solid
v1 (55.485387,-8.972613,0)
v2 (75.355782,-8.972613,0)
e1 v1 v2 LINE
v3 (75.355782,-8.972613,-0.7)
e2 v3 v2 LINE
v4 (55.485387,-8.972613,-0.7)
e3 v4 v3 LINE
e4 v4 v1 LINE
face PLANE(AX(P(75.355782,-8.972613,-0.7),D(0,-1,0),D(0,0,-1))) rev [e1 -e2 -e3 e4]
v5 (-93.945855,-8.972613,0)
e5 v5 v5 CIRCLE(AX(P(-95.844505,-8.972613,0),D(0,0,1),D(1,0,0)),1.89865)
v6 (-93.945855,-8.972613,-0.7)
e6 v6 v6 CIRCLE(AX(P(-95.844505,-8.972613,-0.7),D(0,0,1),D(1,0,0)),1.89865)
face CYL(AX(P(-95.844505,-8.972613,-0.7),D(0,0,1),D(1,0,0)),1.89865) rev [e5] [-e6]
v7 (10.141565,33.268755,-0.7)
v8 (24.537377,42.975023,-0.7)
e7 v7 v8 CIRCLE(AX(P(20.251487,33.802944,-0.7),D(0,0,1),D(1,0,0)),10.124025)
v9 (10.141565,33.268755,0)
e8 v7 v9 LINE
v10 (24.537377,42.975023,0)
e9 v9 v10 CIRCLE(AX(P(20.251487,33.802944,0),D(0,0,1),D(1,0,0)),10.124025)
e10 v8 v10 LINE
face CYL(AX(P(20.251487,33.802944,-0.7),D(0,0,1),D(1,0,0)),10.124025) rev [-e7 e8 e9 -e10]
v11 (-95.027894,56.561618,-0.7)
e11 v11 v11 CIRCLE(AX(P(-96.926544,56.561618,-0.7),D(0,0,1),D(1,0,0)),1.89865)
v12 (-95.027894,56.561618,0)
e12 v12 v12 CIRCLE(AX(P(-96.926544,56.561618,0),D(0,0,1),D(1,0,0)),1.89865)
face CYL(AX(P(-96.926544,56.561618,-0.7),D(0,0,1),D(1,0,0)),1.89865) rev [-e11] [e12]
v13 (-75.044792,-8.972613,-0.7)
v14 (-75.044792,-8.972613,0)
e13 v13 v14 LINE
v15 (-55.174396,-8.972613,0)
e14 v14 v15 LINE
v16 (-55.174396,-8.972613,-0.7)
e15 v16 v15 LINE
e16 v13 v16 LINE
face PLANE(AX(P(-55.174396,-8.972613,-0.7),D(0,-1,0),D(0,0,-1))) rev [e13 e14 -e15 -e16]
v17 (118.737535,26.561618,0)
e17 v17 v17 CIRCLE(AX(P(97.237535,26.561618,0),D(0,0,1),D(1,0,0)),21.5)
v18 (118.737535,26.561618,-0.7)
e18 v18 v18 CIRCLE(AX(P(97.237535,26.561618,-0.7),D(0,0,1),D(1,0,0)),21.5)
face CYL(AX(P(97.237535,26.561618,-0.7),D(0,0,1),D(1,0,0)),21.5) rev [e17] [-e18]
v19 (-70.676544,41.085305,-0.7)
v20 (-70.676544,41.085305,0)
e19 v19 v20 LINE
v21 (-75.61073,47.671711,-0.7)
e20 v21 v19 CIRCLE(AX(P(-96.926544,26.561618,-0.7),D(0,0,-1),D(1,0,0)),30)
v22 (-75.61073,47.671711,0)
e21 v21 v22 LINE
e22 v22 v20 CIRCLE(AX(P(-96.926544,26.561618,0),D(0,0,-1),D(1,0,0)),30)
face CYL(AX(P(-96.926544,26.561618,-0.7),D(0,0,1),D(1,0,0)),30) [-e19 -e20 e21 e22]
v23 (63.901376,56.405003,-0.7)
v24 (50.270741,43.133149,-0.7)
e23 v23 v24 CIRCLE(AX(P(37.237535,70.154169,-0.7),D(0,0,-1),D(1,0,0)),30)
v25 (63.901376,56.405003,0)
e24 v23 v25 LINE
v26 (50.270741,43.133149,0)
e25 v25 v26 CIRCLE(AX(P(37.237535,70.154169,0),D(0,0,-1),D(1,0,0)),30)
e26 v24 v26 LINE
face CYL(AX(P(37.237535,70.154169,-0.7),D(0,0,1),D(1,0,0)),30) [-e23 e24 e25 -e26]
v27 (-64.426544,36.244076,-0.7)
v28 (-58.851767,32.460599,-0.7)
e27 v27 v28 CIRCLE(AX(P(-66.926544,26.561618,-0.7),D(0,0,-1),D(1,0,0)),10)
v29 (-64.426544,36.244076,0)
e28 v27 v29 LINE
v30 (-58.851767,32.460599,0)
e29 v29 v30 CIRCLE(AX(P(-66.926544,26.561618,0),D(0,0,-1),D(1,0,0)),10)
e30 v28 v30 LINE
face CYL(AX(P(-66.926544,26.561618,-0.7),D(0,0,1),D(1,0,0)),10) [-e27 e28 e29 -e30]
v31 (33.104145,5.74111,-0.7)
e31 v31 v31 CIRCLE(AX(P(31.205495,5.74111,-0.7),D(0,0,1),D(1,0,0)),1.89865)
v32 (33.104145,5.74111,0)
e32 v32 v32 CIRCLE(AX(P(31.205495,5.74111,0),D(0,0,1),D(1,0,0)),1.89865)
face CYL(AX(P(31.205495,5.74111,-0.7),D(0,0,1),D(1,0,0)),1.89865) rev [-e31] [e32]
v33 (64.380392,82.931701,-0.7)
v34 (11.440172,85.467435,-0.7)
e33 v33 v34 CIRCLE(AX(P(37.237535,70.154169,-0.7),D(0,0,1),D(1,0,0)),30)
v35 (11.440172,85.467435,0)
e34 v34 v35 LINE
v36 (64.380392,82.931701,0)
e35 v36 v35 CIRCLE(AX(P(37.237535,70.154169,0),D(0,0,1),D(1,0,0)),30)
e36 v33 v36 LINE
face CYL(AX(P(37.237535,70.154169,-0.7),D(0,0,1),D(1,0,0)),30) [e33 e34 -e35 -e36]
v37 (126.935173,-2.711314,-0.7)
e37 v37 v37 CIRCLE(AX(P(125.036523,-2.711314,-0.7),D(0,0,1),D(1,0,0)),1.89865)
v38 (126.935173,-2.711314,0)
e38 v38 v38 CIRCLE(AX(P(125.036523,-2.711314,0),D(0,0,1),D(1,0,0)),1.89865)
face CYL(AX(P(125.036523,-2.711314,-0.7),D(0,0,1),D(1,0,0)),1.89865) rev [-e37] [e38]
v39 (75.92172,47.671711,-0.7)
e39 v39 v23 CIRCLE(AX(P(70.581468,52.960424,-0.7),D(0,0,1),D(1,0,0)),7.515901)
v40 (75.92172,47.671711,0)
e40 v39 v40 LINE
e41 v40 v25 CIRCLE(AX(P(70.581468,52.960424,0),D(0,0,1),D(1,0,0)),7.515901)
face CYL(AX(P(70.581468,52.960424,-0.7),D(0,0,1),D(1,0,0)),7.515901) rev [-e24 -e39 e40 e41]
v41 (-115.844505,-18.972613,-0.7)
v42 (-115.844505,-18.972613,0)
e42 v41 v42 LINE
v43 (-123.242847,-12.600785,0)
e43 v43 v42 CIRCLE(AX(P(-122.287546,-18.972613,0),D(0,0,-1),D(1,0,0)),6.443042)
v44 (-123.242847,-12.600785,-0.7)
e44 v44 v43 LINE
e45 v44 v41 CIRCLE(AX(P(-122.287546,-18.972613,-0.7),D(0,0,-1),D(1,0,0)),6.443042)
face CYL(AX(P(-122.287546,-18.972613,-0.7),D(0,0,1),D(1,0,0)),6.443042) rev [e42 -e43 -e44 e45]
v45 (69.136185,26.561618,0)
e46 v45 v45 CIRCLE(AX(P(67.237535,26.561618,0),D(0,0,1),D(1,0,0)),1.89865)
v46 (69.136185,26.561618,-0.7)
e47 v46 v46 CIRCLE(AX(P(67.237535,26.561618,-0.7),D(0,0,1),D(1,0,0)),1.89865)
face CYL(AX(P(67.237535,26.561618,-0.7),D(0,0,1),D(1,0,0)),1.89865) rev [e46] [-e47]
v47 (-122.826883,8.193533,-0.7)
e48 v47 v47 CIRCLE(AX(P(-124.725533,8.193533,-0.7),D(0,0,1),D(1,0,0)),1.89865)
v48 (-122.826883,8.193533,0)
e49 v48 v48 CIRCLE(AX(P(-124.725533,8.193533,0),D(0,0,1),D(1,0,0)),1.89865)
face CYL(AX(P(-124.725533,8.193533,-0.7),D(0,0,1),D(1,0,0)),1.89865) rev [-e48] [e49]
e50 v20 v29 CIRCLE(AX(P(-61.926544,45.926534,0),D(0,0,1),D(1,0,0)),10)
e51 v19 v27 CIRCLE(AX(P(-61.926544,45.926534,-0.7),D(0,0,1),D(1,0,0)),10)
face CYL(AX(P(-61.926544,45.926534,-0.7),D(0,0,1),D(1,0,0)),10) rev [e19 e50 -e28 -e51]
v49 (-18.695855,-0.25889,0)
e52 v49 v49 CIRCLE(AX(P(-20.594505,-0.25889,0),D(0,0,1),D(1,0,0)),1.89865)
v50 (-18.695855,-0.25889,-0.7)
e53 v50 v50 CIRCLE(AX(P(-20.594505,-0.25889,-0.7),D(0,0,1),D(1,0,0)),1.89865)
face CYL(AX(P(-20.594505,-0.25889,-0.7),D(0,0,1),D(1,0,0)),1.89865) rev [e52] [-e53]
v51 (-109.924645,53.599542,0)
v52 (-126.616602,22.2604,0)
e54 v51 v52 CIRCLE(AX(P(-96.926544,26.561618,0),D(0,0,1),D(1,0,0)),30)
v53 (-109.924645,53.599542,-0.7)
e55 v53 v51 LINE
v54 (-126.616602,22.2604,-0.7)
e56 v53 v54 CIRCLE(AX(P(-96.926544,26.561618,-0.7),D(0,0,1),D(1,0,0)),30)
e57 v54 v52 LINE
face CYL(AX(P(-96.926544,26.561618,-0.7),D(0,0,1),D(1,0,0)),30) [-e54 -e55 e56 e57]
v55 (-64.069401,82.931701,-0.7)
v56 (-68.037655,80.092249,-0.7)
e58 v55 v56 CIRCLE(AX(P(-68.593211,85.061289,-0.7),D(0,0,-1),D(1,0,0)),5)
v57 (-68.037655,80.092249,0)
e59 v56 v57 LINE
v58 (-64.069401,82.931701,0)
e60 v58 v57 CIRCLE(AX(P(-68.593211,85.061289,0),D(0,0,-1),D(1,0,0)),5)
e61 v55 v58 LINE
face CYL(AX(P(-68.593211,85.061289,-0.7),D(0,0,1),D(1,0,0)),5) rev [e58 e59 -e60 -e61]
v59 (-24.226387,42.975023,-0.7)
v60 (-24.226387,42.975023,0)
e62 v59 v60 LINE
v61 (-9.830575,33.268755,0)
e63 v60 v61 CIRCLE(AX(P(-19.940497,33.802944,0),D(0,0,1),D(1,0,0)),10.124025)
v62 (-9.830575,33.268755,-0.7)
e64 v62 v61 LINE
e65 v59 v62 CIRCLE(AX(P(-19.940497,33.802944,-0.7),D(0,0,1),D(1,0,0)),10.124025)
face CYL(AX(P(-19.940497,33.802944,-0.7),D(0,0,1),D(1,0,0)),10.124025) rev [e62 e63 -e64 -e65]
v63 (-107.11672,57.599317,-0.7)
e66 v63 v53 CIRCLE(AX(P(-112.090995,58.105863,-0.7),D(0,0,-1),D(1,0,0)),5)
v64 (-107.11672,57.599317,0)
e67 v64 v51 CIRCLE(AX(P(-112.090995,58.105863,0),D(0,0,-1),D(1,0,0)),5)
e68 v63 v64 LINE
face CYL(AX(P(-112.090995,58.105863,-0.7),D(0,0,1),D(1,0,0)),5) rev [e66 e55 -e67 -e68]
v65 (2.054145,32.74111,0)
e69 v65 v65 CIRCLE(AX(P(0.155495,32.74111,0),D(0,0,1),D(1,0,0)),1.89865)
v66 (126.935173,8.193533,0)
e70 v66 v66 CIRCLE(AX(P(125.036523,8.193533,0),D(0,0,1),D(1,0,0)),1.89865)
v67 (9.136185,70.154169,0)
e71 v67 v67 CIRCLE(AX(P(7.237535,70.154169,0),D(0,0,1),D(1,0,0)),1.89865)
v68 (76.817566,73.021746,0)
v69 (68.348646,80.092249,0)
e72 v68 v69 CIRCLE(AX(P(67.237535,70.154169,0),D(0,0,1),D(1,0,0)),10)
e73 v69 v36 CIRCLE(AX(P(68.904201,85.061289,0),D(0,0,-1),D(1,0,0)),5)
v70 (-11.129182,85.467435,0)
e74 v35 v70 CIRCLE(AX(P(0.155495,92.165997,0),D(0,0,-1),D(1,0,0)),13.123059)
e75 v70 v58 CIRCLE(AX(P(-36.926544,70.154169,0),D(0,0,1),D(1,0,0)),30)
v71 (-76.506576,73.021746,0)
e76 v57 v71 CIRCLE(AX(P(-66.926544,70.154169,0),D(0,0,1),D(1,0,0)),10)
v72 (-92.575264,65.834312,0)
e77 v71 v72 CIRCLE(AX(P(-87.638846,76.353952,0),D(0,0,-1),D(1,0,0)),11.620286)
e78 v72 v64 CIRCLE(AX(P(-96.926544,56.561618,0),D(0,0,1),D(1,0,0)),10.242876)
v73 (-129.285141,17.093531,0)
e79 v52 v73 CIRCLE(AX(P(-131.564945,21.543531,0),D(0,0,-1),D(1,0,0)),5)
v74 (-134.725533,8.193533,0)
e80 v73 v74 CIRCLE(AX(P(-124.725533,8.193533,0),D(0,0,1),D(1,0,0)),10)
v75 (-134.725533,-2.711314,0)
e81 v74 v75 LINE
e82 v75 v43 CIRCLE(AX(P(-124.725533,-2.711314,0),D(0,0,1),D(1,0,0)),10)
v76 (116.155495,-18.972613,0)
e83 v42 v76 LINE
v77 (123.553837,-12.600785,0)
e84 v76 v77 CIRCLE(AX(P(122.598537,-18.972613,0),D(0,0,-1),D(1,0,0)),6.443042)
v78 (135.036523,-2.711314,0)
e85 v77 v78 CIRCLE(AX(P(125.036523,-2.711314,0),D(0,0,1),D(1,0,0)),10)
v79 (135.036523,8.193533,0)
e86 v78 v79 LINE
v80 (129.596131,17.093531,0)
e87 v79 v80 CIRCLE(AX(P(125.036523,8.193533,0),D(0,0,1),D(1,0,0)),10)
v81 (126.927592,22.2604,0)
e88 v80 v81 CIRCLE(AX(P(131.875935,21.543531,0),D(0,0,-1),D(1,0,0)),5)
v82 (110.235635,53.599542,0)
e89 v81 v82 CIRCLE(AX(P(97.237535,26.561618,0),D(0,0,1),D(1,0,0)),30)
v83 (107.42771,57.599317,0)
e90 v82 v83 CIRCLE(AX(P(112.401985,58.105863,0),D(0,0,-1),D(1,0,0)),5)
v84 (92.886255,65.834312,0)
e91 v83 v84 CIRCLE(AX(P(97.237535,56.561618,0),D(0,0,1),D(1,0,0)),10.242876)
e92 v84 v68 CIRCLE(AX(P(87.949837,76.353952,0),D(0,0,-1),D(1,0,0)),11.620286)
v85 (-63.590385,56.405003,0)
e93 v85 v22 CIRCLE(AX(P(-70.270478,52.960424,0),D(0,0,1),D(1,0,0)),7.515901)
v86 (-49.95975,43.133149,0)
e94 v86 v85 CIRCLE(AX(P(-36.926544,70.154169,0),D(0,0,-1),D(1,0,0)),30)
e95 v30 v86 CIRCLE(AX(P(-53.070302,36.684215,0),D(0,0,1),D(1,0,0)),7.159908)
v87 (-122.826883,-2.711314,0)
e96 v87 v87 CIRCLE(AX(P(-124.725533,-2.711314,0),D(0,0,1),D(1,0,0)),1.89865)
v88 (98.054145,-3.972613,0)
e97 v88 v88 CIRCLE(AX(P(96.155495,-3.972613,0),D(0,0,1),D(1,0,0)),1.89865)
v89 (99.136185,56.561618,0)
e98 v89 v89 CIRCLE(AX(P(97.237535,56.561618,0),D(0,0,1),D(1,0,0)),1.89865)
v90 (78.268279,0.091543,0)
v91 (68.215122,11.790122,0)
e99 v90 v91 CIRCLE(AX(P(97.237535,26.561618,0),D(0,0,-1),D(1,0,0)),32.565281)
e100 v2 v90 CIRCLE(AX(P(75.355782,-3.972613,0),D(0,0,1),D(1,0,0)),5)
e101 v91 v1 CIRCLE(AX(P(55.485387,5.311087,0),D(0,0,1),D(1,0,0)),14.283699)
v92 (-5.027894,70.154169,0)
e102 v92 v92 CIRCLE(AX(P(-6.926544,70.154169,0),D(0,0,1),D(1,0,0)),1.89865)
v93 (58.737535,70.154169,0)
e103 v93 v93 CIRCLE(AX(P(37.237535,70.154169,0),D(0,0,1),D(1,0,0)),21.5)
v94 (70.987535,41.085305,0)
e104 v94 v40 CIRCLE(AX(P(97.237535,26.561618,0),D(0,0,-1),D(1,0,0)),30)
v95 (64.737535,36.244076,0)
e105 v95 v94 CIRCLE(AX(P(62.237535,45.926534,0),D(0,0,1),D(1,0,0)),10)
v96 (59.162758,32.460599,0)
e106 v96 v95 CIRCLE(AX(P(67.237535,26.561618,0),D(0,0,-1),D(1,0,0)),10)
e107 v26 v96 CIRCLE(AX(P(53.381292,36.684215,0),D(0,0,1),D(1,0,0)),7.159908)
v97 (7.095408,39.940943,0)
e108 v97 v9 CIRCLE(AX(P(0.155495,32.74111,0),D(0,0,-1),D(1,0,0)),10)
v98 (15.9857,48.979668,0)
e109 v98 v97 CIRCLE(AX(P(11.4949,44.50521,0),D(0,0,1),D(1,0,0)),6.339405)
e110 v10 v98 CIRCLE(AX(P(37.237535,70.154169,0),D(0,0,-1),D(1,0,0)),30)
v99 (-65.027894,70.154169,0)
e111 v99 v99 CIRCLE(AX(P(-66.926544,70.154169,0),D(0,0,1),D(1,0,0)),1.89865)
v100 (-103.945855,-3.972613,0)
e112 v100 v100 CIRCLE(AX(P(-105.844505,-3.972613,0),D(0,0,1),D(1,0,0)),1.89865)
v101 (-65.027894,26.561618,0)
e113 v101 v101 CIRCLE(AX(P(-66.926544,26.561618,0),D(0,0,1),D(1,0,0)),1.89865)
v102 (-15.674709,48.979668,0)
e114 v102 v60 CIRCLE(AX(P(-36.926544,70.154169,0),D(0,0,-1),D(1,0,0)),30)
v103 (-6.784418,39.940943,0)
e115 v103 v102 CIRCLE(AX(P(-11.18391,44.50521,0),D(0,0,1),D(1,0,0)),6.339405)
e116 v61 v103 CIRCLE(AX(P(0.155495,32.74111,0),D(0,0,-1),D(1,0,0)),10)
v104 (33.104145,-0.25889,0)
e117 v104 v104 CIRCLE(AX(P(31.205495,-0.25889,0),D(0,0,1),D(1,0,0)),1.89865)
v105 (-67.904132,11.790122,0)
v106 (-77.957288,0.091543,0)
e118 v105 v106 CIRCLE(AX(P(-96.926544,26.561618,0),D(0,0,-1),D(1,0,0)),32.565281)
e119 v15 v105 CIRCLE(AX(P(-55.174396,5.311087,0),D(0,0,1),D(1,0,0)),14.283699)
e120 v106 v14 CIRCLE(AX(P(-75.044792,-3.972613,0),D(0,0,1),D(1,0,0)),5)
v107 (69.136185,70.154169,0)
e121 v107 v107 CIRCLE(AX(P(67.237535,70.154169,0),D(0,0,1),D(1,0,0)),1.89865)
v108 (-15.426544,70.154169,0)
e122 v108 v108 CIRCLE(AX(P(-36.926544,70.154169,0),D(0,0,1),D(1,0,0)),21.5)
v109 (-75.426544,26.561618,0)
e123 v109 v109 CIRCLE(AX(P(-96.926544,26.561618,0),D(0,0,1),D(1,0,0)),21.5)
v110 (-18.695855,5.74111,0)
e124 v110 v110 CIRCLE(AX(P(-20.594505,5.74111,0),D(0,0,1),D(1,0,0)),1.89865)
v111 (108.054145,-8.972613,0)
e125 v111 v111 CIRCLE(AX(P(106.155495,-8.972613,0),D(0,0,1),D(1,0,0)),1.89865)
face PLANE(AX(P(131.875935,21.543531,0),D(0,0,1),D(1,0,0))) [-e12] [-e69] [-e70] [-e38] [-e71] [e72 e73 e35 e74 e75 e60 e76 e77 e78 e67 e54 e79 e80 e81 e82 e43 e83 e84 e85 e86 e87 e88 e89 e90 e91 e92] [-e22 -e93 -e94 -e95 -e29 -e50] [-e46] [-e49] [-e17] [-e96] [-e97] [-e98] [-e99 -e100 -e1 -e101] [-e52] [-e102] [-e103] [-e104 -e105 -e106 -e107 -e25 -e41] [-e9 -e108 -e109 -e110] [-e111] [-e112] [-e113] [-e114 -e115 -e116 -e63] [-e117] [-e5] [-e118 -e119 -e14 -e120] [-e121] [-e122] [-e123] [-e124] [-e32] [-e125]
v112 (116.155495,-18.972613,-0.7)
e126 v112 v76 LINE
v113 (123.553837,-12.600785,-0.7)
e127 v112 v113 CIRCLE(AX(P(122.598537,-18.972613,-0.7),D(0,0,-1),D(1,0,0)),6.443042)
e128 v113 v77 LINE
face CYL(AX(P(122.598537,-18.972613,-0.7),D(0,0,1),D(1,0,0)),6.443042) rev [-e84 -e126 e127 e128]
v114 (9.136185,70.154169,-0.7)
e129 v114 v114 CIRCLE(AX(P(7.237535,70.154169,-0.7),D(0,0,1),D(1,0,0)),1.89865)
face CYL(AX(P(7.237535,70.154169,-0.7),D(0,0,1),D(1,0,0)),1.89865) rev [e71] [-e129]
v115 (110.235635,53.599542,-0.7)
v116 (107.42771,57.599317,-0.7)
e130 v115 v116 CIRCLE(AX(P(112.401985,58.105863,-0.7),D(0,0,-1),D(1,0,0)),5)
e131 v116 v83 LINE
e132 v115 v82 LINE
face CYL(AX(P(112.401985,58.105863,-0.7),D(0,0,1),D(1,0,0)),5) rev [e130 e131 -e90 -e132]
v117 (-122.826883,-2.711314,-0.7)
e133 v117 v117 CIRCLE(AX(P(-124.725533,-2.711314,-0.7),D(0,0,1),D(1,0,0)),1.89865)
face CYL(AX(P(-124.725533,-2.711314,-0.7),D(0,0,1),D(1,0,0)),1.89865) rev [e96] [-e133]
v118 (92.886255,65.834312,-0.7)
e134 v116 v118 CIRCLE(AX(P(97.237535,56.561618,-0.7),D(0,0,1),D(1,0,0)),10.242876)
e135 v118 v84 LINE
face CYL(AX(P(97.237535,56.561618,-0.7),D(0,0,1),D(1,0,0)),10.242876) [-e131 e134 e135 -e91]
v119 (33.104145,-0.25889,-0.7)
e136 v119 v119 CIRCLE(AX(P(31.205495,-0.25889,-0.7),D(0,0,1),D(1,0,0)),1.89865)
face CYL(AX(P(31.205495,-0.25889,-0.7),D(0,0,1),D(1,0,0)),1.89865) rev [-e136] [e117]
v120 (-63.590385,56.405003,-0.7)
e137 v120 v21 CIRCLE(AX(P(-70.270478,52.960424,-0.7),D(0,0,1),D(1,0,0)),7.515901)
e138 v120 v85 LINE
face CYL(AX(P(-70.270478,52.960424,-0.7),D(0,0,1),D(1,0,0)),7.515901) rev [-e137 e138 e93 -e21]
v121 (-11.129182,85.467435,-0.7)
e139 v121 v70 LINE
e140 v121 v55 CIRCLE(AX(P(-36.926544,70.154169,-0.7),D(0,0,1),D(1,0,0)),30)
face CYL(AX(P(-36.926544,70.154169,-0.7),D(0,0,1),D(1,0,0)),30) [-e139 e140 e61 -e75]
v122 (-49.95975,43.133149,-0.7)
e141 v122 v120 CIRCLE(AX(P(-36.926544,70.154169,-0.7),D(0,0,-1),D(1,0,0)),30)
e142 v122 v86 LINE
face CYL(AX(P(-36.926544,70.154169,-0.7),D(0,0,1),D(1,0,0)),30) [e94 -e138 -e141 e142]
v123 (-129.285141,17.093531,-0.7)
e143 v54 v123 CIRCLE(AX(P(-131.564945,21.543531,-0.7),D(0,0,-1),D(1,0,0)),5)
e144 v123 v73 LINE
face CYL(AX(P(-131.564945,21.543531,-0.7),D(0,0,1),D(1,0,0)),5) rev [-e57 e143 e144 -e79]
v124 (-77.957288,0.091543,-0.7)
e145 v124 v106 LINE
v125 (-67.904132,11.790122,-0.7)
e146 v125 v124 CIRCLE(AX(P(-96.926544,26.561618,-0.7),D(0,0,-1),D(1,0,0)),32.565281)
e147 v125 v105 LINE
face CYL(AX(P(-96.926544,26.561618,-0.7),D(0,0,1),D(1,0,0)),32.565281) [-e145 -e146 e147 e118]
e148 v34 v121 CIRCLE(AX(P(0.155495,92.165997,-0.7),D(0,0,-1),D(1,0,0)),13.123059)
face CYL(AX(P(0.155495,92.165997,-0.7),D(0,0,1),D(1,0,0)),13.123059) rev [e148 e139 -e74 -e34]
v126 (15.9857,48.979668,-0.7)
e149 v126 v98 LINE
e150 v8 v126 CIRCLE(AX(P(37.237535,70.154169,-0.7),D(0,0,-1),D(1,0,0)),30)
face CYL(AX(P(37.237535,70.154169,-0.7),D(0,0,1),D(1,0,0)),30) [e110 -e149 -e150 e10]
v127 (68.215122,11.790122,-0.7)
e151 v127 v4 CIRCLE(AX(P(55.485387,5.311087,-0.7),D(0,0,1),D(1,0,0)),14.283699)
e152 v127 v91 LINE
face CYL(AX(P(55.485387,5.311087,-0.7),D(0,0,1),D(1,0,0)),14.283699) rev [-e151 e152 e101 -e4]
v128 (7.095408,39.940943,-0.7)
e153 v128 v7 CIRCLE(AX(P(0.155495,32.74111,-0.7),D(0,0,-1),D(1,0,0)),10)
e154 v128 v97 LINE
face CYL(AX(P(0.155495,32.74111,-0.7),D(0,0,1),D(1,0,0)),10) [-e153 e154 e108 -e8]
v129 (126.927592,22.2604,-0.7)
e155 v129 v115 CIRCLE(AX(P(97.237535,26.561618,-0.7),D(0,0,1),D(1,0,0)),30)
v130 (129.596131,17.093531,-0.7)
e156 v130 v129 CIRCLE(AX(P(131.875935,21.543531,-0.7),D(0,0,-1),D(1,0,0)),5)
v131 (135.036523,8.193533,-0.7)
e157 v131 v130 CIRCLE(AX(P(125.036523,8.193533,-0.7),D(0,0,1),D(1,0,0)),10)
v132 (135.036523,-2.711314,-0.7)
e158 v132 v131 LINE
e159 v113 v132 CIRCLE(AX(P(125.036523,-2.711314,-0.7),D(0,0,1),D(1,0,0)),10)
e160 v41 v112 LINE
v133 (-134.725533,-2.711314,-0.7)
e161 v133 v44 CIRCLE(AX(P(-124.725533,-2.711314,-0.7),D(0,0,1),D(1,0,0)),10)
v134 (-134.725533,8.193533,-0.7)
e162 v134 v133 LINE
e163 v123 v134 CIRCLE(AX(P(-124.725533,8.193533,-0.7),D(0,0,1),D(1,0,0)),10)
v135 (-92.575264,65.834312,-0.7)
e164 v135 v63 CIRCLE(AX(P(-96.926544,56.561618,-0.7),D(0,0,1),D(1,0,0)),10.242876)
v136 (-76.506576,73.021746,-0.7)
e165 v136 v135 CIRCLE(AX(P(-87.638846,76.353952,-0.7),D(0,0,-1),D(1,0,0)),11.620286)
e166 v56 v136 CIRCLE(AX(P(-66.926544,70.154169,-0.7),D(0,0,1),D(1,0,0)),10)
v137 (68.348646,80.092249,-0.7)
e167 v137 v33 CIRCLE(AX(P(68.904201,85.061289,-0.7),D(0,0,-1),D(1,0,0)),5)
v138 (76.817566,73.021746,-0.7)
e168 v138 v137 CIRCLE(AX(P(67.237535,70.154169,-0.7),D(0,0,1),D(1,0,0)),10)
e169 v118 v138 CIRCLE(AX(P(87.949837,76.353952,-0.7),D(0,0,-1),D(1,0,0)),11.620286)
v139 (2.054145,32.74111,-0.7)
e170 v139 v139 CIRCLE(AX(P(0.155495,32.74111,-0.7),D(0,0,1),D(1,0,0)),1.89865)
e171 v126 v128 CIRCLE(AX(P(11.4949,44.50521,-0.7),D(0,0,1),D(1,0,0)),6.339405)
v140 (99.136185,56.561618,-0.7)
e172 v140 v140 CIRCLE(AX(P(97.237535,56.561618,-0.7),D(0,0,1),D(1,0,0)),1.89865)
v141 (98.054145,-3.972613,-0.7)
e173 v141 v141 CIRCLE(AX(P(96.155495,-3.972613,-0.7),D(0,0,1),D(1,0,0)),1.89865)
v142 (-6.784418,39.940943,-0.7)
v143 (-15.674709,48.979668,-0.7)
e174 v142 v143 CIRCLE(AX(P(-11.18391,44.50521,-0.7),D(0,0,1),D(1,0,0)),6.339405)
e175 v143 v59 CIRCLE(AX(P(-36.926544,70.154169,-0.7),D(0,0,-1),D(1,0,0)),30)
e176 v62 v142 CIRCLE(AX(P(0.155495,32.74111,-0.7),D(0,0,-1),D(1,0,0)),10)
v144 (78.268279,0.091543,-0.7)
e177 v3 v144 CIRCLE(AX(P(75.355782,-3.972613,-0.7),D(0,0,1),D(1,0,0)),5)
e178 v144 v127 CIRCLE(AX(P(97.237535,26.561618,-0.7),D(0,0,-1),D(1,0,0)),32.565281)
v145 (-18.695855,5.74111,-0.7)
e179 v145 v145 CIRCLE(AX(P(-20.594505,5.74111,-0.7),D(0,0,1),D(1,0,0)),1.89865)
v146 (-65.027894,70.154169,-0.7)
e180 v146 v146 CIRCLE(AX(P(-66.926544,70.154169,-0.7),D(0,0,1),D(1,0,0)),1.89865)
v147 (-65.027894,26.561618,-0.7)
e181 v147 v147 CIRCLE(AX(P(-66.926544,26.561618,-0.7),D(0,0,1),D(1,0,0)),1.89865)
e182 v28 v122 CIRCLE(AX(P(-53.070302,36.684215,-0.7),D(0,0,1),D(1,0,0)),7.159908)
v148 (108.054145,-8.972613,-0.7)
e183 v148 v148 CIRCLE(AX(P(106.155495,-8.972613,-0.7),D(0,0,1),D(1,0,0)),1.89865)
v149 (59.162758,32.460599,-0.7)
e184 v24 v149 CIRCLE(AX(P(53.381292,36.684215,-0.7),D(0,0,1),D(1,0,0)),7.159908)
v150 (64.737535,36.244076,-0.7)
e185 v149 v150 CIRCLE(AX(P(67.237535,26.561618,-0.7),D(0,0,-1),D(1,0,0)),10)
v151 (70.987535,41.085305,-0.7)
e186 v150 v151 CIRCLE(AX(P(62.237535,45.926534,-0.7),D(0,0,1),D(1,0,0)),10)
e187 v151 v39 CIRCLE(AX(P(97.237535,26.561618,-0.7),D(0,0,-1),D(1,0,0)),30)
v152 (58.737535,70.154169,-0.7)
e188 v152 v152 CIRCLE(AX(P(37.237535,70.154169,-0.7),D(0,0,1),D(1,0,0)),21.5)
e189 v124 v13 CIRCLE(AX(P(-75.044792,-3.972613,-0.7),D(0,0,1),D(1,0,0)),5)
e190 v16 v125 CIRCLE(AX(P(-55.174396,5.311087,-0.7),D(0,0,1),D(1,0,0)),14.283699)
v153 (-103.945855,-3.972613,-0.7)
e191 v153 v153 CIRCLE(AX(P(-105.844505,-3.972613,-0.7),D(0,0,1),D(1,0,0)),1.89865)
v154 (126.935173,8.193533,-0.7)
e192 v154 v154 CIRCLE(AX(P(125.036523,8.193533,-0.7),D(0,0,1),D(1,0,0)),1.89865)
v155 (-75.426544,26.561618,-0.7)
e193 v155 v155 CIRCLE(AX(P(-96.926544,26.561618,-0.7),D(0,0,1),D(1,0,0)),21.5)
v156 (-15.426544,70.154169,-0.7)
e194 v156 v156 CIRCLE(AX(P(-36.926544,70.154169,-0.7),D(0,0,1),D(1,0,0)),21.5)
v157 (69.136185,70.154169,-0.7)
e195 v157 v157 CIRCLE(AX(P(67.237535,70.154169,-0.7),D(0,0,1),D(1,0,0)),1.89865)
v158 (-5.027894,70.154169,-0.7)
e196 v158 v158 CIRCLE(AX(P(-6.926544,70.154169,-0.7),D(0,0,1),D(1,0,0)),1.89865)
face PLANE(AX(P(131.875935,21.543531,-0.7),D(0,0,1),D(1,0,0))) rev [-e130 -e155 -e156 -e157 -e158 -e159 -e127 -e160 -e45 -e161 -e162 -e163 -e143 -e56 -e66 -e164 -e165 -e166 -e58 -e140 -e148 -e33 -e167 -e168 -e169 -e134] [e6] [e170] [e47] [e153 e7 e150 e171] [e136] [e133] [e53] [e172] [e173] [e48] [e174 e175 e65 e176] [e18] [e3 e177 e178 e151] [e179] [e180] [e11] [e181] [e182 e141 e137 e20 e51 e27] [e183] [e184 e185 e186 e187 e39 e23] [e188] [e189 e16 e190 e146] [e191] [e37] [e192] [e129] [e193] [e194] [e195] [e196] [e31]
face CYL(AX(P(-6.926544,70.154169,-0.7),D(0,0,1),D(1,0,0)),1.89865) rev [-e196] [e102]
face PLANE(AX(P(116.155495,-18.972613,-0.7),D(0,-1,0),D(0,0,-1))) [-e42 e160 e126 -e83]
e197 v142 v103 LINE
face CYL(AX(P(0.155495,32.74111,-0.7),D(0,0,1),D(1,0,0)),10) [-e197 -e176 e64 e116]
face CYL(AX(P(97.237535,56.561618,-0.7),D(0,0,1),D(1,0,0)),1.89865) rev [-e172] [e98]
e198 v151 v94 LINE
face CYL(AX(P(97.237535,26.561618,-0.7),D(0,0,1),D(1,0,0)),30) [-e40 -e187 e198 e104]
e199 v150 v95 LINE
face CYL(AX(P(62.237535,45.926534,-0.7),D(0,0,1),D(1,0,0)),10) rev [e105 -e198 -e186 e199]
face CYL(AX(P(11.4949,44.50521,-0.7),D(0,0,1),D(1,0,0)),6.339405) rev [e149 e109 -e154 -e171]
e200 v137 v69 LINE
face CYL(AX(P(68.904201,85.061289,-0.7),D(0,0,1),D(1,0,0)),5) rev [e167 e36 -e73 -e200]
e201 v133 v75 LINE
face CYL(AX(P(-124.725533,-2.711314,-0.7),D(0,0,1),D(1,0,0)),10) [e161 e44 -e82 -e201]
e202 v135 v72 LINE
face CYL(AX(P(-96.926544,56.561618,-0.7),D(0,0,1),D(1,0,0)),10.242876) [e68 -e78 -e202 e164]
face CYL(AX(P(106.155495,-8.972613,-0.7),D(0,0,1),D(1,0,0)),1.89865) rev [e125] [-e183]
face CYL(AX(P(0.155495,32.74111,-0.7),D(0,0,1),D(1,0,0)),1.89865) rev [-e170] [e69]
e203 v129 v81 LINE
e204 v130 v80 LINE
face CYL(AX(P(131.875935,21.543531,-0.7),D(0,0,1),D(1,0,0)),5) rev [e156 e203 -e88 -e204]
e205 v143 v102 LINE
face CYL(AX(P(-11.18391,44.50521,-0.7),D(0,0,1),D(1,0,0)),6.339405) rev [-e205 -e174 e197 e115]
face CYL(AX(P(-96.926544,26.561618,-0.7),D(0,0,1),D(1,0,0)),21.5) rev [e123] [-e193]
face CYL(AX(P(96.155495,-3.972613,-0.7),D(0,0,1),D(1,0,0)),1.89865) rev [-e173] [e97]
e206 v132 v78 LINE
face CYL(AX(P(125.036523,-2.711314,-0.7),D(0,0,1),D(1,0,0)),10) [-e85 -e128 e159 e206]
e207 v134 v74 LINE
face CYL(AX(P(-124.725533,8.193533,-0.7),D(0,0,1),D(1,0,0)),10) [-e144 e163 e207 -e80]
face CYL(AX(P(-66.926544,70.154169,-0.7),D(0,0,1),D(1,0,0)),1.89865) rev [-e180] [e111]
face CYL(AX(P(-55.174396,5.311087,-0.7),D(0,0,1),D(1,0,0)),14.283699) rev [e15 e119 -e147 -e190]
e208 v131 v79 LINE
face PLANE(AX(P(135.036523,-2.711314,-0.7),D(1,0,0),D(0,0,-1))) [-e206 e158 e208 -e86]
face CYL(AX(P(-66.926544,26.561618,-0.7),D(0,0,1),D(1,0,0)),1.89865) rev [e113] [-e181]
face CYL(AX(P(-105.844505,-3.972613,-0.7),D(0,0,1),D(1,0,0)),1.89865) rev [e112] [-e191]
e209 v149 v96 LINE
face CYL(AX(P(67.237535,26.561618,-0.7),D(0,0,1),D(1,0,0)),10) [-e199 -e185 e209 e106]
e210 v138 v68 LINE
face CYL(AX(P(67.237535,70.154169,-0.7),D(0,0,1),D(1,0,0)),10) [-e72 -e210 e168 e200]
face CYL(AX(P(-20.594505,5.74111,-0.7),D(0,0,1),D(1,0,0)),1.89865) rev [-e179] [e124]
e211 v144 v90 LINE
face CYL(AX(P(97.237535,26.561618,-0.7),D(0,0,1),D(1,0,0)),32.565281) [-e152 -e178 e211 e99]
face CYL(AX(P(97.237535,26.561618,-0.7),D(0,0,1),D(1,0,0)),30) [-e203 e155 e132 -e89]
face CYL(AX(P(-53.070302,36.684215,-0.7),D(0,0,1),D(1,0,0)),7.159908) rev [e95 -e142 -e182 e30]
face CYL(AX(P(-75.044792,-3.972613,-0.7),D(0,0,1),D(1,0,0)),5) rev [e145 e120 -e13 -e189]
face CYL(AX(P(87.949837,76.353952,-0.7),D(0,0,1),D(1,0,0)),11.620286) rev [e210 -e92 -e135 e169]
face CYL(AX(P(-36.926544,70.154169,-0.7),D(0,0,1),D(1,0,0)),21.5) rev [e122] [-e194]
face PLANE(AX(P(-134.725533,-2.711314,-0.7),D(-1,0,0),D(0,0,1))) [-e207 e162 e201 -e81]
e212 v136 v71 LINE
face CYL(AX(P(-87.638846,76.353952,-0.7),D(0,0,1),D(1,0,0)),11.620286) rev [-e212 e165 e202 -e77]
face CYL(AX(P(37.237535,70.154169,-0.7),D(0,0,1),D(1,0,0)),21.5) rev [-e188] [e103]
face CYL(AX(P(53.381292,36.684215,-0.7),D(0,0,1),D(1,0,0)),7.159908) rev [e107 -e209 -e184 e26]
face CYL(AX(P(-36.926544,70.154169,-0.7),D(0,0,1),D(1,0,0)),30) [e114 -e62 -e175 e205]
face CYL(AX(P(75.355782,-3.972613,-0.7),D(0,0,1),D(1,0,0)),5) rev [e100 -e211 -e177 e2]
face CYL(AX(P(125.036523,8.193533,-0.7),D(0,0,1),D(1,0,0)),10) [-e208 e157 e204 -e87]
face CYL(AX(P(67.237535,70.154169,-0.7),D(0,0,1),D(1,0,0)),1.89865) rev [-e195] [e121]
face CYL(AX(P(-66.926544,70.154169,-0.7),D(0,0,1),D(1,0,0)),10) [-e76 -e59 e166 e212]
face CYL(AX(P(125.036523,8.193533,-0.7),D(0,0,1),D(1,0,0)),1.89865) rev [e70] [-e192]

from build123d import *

# Parameters (mm, degrees)
MODEL_R            = 21.5
MODEL_R_2          = 1.89865
BASE_FLANGE1_DEPTH = 0.7


# Sheet-metal steps are written as plain solids
with BuildPart() as part:
    # Model → Base-Flange1 (new body)
    with BuildSketch(Plane.XY):
        with BuildLine():
            Line((-134.72553251, -2.711313899), (-134.72553251, 8.193532943))
            ThreePointArc((-134.72553251, 8.193532943), (-133.25770932, 13.409082664), (-129.285140732, 17.093531418))
            ThreePointArc((-129.285140732, 17.093531418), (-127.122461212, 19.249115875), (-126.616601885, 22.260400219))
            ThreePointArc((-126.616601885, 22.260400219), (-123.404934832, 40.6646253), (-109.924644657, 53.599542498))
            ThreePointArc((-109.924644657, 53.599542498), (-107.998724055, 55.233004005), (-107.116719879, 57.599316598))
            ThreePointArc((-107.116719879, 57.599316598), (-101.974015213, 65.474503584), (-92.575264278, 65.83431216))
            ThreePointArc((-92.575264278, 65.83431216), (-82.894170466, 65.746450056), (-76.506575672, 73.021745919))
            ThreePointArc((-76.506575672, 73.021745919), (-73.335376859, 77.830552746), (-68.037655249, 80.092249178))
            ThreePointArc((-68.037655249, 80.092249178), (-65.683638934, 80.995038824), (-64.06940128, 82.931700578))
            ThreePointArc((-64.06940128, 82.931700578), (-38.361840541, 100.119815012), (-11.129181755, 85.467434576))
            ThreePointArc((-11.129181755, 85.467434576), (0.155495187, 79.042938382), (11.440172129, 85.467434576))
            ThreePointArc((11.440172129, 85.467434576), (38.672830915, 100.119815012), (64.380391655, 82.931700578))
            ThreePointArc((64.380391655, 82.931700578), (65.994629309, 80.995038824), (68.348645623, 80.092249178))
            ThreePointArc((68.348645623, 80.092249178), (73.646367234, 77.830552746), (76.817566047, 73.021745919))
            ThreePointArc((76.817566047, 73.021745919), (83.205160841, 65.746450057), (92.886254653, 65.83431216))
            ThreePointArc((92.886254653, 65.83431216), (102.285005587, 65.474503584), (107.427710253, 57.599316599))
            ThreePointArc((107.427710253, 57.599316599), (108.309714429, 55.233004005), (110.235635031, 53.599542498))
            ThreePointArc((110.235635031, 53.599542498), (123.715925206, 40.6646253), (126.92759226, 22.260400219))
            ThreePointArc((126.92759226, 22.260400219), (127.433451587, 19.249115875), (129.596131107, 17.093531418))
            ThreePointArc((129.596131107, 17.093531418), (133.568699694, 13.409082664), (135.036522885, 8.193532943))
            Line((135.036522885, 8.193532943), (135.036522885, -2.711313899))
            ThreePointArc((135.036522885, -2.711313899), (131.562361662, -10.288478821), (123.553837233, -12.600785232))
            ThreePointArc((123.553837233, -12.600785232), (118.393911689, -14.090613855), (116.155495187, -18.972612677))
            Line((116.155495187, -18.972612677), (-115.844504813, -18.972612677))
            ThreePointArc((-115.844504813, -18.972612677), (-118.082921315, -14.090613855), (-123.242846859, -12.600785232))
            ThreePointArc((-123.242846859, -12.600785232), (-131.251371287, -10.288478821), (-134.72553251, -2.711313899))
        make_face()
        with Locations((97.237534512, 26.561617598)):
            Circle(MODEL_R, mode=Mode.SUBTRACT)
        with Locations((37.237534512, 70.154169278)):
            Circle(MODEL_R, mode=Mode.SUBTRACT)
        with Locations((-36.926544138, 70.154169278)):
            Circle(MODEL_R, mode=Mode.SUBTRACT)
        with Locations((-96.926544138, 26.561617598)):
            Circle(MODEL_R, mode=Mode.SUBTRACT)
        with Locations((-66.926544138, 26.561617598)):
            Circle(MODEL_R_2, mode=Mode.SUBTRACT)
        with Locations((-96.926544138, 56.561617598)):
            Circle(MODEL_R_2, mode=Mode.SUBTRACT)
        with Locations((-66.926544138, 70.154169278)):
            Circle(MODEL_R_2, mode=Mode.SUBTRACT)
        with Locations((-6.926544138, 70.154169278)):
            Circle(MODEL_R_2, mode=Mode.SUBTRACT)
        with Locations((7.237534512, 70.154169278)):
            Circle(MODEL_R_2, mode=Mode.SUBTRACT)
        with Locations((67.237534512, 70.154169278)):
            Circle(MODEL_R_2, mode=Mode.SUBTRACT)
        with Locations((67.237534512, 26.561617598)):
            Circle(MODEL_R_2, mode=Mode.SUBTRACT)
        with Locations((97.237534512, 56.561617598)):
            Circle(MODEL_R_2, mode=Mode.SUBTRACT)
        with Locations((31.205495187, 5.741109522)):
            Circle(MODEL_R_2, mode=Mode.SUBTRACT)
        with Locations((31.205495187, -0.258890478)):
            Circle(MODEL_R_2, mode=Mode.SUBTRACT)
        with Locations((-20.594504813, 5.741109522)):
            Circle(MODEL_R_2, mode=Mode.SUBTRACT)
        with Locations((-20.594504813, -0.258890478)):
            Circle(MODEL_R_2, mode=Mode.SUBTRACT)
        with Locations((106.155495187, -8.972612677)):
            Circle(MODEL_R_2, mode=Mode.SUBTRACT)
        with Locations((96.155495187, -3.972612677)):
            Circle(MODEL_R_2, mode=Mode.SUBTRACT)
        with Locations((-95.844504813, -8.972612677)):
            Circle(MODEL_R_2, mode=Mode.SUBTRACT)
        with Locations((-105.844504813, -3.972612677)):
            Circle(MODEL_R_2, mode=Mode.SUBTRACT)
        with Locations((0.155495187, 32.741109522)):
            Circle(MODEL_R_2, mode=Mode.SUBTRACT)
        with Locations((125.036522885, 8.193532943)):
            Circle(MODEL_R_2, mode=Mode.SUBTRACT)
        with Locations((125.036522885, -2.711313899)):
            Circle(MODEL_R_2, mode=Mode.SUBTRACT)
        with Locations((-124.72553251, 8.193532943)):
            Circle(MODEL_R_2, mode=Mode.SUBTRACT)
        with Locations((-124.72553251, -2.711313899)):
            Circle(MODEL_R_2, mode=Mode.SUBTRACT)
        with BuildLine():
            Line((-55.174396268, -8.972612677), (-75.044791575, -8.972612677))
            ThreePointArc((-75.044791575, -8.972612677), (-79.805084567, -5.502191259), (-77.957288455, 0.091543068))
            ThreePointArc((-77.957288455, 0.091543068), (-72.228077848, 5.337026443), (-67.904131763, 11.790121847))
            ThreePointArc((-67.904131763, 11.790121847), (-42.997191019, 12.776991486), (-55.174396268, -8.972612677))
        make_face(mode=Mode.SUBTRACT)
        with BuildLine():
            Line((75.35578195, -8.972612677), (55.485386642, -8.972612677))
            ThreePointArc((55.485386642, -8.972612677), (43.308181393, 12.776991486), (68.215122138, 11.790121847))
            ThreePointArc((68.215122138, 11.790121847), (72.539068222, 5.337026444), (78.26827883, 0.091543068))
            ThreePointArc((78.26827883, 0.091543068), (80.116074941, -5.502191258), (75.35578195, -8.972612677))
        make_face(mode=Mode.SUBTRACT)
        with BuildLine():
            ThreePointArc((-70.676544138, 41.085305146), (-72.916715678, 44.548505526), (-75.610729677, 47.671711247))
            ThreePointArc((-75.610729677, 47.671711247), (-74.68821375, 59.040915165), (-63.59038518, 56.405002726))
            ThreePointArc((-63.59038518, 56.405002726), (-57.854979641, 48.659970354), (-49.959750183, 43.133148939))
            ThreePointArc((-49.959750183, 43.133148939), (-47.569458742, 32.101093782), (-58.851767466, 32.46059901))
            ThreePointArc((-58.851767466, 32.46059901), (-61.310927531, 34.835966522), (-64.426544138, 36.244075963))
            ThreePointArc((-64.426544138, 36.244075963), (-68.050268495, 38.020840178), (-70.676544138, 41.085305146))
        make_face(mode=Mode.SUBTRACT)
        with BuildLine():
            ThreePointArc((-6.784417864, 39.940943329), (-6.664317076, 48.950582141), (-15.674709396, 48.979667628))
            ThreePointArc((-15.674709396, 48.979667628), (-19.687101522, 45.602150659), (-24.226386782, 42.975022802))
            ThreePointArc((-24.226386782, 42.975022802), (-25.600244312, 25.408712194), (-9.830574629, 33.268754878))
            ThreePointArc((-9.830574629, 33.268754878), (-8.941303628, 36.894210931), (-6.784417864, 39.940943329))
        make_face(mode=Mode.SUBTRACT)
        with BuildLine():
            ThreePointArc((10.141565004, 33.268754878), (25.911234687, 25.408712194), (24.537377157, 42.975022802))
            ThreePointArc((24.537377157, 42.975022802), (19.998091896, 45.602150659), (15.98569977, 48.979667628))
            ThreePointArc((15.98569977, 48.979667628), (6.975307449, 48.950582143), (7.095408238, 39.940943329))
            ThreePointArc((7.095408238, 39.940943329), (9.252294003, 36.894210931), (10.141565004, 33.268754878))
        make_face(mode=Mode.SUBTRACT)
        with BuildLine():
            ThreePointArc((64.737534512, 36.244075963), (68.361258869, 38.020840178), (70.987534512, 41.085305146))
            ThreePointArc((70.987534512, 41.085305146), (73.227706053, 44.548505526), (75.921720052, 47.671711247))
            ThreePointArc((75.921720052, 47.671711247), (74.999204125, 59.040915165), (63.901375554, 56.405002726))
            ThreePointArc((63.901375554, 56.405002726), (58.165970015, 48.659970354), (50.270740558, 43.133148939))
            ThreePointArc((50.270740558, 43.133148939), (47.880449116, 32.101093782), (59.16275784, 32.46059901))
            ThreePointArc((59.16275784, 32.46059901), (61.621917905, 34.835966522), (64.737534512, 36.244075963))
        make_face(mode=Mode.SUBTRACT)
    extrude(amount=-BASE_FLANGE1_DEPTH)


solid = part.part
